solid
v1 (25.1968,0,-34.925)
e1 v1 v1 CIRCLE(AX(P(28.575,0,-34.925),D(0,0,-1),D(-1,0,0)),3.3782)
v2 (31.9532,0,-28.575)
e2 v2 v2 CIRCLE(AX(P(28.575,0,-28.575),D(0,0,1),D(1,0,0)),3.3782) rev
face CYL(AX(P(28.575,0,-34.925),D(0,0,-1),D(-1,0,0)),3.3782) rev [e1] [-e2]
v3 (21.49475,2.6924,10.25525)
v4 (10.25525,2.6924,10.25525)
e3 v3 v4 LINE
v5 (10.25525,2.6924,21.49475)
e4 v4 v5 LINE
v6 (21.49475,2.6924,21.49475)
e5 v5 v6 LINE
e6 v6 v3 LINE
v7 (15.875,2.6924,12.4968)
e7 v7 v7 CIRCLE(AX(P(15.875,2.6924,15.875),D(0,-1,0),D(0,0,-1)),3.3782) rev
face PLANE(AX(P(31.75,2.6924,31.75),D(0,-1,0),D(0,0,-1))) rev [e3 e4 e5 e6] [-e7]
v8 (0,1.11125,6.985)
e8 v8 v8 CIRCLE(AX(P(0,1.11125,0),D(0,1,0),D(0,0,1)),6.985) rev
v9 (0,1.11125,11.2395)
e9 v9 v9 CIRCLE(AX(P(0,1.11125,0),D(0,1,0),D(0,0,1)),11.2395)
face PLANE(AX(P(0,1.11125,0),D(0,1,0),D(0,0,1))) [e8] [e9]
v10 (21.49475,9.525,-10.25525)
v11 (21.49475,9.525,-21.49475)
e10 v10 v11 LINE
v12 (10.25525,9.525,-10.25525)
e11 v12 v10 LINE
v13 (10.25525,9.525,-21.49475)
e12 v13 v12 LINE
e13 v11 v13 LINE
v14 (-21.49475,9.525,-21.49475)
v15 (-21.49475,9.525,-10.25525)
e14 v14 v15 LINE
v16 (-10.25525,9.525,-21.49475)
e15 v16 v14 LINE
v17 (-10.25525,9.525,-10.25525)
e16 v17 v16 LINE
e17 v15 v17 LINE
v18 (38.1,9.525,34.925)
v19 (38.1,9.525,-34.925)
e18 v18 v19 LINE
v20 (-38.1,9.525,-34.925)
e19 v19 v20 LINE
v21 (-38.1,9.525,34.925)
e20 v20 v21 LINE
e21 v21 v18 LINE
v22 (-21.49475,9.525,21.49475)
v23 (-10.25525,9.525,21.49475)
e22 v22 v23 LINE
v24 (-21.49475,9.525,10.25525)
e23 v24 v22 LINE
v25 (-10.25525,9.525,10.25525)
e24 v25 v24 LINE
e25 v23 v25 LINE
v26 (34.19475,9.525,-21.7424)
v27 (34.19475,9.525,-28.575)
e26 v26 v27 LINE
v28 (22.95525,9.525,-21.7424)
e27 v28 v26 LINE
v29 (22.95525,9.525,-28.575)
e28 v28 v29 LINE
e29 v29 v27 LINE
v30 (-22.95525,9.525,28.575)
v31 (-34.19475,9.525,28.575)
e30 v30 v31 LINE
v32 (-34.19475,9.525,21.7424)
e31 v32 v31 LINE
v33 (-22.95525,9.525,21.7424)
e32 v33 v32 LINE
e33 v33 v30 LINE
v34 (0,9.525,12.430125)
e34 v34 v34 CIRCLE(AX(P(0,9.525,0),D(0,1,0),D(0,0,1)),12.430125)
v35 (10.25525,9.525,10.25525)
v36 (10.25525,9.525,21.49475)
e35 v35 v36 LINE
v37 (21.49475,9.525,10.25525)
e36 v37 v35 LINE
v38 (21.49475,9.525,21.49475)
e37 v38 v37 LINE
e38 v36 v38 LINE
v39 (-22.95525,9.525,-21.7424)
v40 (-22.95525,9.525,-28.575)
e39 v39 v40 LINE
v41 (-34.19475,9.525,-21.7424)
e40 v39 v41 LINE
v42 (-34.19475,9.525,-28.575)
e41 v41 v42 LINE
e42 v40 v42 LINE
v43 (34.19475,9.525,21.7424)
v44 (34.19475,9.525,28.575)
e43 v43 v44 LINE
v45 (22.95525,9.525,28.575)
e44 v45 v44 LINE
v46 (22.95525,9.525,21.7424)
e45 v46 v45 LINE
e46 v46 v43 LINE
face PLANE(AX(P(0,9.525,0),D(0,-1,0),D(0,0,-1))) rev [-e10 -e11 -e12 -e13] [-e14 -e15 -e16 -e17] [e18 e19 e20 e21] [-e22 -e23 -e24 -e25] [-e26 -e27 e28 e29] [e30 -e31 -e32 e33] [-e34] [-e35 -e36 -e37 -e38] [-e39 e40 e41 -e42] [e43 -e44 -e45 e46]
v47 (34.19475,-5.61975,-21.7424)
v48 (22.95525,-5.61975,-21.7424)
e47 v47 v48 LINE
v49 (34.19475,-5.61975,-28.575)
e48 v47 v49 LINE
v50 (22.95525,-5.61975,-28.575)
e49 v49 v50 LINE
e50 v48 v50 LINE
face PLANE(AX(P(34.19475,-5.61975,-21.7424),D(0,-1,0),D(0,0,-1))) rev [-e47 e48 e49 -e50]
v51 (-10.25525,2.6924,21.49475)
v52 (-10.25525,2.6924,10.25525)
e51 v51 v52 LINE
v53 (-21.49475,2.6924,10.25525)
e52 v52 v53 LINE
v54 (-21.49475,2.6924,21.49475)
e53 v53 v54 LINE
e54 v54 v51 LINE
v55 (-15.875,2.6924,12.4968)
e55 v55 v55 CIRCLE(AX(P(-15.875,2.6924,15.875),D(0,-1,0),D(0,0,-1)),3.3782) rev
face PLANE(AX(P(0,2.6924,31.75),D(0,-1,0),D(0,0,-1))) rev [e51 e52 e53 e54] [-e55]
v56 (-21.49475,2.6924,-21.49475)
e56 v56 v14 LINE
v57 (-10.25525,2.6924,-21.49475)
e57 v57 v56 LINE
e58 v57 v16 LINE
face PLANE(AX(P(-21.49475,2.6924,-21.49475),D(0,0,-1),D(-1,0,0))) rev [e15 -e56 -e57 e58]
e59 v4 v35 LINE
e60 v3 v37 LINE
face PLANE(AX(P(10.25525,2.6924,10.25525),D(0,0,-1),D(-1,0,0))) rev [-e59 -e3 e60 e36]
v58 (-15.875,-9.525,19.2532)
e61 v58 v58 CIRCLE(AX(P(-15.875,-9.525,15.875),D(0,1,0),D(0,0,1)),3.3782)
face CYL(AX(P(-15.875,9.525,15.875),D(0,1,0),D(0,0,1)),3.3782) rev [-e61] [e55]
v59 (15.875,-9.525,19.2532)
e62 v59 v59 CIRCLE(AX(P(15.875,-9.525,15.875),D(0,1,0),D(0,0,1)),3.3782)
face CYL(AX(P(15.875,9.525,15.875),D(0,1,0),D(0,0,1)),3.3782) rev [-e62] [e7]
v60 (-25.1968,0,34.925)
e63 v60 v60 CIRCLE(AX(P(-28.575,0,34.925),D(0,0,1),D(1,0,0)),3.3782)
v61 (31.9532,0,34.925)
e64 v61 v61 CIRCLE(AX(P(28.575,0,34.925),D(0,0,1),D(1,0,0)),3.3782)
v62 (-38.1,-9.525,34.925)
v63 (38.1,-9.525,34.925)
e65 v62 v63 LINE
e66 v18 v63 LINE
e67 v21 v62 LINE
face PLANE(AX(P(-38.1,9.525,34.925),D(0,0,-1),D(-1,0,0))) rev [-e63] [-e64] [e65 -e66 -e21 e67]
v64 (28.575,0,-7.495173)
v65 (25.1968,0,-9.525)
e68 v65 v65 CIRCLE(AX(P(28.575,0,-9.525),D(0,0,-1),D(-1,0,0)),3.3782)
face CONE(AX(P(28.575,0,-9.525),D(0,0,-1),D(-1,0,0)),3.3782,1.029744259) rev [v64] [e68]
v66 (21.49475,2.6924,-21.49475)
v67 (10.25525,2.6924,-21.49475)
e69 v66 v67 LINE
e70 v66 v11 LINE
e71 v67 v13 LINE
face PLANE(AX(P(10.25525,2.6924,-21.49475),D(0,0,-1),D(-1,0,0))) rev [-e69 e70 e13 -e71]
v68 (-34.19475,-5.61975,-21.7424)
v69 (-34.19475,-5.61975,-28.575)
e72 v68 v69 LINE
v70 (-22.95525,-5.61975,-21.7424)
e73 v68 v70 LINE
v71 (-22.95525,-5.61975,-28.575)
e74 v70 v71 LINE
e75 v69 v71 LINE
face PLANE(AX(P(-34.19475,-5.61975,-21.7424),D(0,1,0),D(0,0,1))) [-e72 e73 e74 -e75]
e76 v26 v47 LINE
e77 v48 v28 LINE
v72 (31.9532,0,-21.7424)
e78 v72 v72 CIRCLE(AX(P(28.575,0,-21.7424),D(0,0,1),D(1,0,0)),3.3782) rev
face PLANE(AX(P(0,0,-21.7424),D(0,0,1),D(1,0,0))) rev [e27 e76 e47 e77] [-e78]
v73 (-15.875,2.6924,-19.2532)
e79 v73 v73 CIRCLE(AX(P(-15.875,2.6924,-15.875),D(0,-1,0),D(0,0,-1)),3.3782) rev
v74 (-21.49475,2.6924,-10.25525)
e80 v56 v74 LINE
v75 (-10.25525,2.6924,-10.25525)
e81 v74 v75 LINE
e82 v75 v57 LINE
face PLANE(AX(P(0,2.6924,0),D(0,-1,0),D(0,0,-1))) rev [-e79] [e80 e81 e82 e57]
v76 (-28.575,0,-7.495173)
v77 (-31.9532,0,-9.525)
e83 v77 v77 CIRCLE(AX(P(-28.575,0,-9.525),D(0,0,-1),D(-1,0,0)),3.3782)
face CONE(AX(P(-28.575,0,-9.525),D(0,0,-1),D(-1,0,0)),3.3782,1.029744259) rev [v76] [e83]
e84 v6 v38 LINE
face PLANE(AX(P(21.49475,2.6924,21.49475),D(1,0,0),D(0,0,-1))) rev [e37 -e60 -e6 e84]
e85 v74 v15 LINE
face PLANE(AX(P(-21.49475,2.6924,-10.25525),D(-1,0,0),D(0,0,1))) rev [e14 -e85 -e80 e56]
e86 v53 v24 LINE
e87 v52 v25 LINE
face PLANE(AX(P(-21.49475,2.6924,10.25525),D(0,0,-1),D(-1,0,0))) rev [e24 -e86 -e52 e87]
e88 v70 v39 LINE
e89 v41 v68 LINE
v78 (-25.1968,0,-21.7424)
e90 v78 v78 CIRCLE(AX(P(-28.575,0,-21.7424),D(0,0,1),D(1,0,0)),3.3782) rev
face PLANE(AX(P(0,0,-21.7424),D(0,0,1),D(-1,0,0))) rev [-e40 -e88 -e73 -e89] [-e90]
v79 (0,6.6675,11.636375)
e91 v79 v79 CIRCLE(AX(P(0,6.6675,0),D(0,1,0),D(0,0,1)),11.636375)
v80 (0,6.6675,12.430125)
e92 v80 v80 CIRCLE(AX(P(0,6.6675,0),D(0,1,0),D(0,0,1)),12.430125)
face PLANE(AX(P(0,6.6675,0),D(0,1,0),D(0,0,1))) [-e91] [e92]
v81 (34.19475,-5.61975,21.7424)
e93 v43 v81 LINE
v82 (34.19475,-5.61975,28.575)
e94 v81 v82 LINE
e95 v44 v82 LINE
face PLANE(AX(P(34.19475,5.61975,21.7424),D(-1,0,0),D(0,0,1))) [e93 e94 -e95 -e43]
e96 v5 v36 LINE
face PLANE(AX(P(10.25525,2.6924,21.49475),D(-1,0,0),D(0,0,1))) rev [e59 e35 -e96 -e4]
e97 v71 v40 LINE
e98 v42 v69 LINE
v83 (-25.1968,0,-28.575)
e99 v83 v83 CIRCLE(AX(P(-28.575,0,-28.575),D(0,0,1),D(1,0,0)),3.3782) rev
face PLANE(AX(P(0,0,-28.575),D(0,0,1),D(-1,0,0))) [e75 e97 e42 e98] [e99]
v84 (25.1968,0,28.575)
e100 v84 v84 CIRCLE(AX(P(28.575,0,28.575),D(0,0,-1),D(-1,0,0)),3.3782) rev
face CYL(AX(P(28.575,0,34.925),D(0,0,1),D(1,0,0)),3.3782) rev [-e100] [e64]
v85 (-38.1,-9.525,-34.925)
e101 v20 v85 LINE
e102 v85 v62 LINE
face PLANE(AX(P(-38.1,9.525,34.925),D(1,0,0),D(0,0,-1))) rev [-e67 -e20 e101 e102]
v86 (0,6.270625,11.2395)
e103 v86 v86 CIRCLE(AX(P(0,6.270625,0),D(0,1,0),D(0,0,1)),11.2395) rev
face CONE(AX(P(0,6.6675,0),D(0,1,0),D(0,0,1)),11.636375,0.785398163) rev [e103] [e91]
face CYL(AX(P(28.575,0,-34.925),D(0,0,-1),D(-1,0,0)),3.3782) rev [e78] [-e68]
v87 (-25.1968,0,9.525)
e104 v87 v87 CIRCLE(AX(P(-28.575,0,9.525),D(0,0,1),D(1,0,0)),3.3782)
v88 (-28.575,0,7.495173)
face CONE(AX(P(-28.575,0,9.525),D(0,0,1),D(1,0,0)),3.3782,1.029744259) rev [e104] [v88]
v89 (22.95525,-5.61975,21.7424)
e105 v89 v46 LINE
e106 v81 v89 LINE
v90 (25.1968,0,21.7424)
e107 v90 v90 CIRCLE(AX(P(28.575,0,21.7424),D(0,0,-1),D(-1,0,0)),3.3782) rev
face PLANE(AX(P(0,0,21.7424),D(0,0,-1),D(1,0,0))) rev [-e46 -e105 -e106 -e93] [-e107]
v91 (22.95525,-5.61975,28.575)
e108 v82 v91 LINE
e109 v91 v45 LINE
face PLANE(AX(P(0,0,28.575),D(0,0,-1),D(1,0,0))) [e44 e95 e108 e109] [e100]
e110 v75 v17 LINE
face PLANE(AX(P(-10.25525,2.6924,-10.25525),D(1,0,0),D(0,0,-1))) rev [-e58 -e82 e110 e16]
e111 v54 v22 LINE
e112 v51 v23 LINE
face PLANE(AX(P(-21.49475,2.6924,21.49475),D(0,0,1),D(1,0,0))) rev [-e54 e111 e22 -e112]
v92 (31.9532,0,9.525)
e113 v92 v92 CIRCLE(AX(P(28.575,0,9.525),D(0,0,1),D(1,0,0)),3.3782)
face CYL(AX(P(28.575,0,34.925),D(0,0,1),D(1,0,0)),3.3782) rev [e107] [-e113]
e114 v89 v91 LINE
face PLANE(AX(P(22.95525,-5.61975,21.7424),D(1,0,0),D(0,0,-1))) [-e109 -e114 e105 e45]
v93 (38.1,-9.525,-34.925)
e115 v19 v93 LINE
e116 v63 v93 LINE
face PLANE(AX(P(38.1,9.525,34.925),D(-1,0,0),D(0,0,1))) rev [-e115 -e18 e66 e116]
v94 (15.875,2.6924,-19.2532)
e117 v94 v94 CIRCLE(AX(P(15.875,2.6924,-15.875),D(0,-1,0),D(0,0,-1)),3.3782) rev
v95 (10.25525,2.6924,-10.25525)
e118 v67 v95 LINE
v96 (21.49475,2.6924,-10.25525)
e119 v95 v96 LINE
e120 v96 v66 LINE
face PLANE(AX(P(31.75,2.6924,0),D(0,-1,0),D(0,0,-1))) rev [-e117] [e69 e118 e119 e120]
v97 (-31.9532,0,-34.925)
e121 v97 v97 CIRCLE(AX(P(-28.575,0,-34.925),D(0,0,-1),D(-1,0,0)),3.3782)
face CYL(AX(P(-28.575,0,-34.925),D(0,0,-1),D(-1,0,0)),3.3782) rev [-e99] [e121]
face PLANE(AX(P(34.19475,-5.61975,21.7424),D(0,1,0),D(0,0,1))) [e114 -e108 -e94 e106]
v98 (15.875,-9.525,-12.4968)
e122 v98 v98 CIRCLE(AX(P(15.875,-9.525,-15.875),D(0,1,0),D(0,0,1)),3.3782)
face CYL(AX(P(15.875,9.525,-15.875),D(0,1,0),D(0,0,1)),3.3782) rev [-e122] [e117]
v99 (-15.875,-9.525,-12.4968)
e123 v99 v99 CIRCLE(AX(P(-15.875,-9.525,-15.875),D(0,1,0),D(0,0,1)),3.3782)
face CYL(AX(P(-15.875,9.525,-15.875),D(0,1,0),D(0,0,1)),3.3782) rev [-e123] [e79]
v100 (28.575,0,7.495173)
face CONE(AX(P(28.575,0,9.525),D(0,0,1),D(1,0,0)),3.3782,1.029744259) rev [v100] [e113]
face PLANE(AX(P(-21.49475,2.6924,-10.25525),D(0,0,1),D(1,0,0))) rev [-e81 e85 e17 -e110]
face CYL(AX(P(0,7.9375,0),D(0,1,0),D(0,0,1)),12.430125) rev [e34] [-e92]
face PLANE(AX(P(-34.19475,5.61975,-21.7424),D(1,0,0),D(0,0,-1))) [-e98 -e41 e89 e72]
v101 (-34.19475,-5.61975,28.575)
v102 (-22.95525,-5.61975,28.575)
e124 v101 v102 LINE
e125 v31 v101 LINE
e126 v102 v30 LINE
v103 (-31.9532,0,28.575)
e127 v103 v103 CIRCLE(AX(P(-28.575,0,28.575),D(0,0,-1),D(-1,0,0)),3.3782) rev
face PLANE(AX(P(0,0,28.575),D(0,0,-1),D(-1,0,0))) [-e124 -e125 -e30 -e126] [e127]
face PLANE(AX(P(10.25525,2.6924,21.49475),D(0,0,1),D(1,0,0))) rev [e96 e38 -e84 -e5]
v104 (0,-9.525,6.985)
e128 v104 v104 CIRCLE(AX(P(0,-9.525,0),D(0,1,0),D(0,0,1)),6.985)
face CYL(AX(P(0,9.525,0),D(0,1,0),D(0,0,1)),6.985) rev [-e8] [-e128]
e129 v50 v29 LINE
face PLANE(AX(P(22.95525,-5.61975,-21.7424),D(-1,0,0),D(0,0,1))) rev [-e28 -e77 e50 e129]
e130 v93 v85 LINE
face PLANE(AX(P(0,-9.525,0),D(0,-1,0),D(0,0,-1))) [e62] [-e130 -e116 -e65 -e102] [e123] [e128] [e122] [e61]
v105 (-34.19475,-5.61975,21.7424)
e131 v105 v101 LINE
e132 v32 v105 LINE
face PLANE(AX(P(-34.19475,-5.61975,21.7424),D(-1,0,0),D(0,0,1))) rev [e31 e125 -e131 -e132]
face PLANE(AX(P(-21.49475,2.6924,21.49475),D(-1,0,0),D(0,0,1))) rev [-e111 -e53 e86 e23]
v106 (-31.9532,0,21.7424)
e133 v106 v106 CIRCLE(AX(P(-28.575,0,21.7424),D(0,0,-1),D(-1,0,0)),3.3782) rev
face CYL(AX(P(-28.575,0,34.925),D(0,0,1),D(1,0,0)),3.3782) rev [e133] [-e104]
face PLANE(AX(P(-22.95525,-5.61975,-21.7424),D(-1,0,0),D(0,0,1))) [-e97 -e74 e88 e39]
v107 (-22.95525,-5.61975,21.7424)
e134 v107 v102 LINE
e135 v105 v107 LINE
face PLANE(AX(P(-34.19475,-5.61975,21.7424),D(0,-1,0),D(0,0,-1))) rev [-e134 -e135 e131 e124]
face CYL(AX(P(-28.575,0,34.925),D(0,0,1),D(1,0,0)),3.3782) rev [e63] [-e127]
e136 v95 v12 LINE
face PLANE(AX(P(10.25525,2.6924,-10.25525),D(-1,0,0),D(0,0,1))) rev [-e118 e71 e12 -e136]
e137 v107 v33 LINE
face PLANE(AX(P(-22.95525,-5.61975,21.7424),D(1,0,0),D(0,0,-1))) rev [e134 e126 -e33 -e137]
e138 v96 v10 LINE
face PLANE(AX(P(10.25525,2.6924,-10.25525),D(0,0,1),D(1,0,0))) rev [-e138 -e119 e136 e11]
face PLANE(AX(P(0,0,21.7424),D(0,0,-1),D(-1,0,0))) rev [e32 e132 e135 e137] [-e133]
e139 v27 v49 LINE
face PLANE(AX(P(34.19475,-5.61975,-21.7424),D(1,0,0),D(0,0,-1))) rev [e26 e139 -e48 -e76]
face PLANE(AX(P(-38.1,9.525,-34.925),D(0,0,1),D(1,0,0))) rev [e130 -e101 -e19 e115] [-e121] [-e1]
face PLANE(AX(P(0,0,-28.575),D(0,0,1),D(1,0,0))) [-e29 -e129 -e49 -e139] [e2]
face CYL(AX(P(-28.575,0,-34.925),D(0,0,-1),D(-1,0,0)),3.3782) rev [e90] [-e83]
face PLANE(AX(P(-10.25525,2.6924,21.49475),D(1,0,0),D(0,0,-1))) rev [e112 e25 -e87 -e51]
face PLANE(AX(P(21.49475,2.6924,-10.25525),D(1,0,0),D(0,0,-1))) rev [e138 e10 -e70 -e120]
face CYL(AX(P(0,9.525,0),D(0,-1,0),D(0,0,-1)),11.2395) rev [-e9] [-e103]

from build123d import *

# Parameters (mm, degrees)
SKETCH1_W               = 76.2
SKETCH1_H               = 69.85
BOSS_EXTRUDE1_DEPTH     = 9.525
F_1_4_CLEARANCE_HOLE1_D = 6.7564
SKETCH5_W               = 11.2395
SKETCH5_H               = 11.2395
CUT_EXTRUDE1_DEPTH      = 6.8326
F_3_8_CLEARANCE_HOLE1_D = 13.97
CUT_EXTRUDE2_START      = -6.35
CUT_EXTRUDE2_DEPTH      = 6.8326
MIRROR2_START           = -6.35
MIRROR2_COPY_2_DEPTH    = 6.8326


with BuildPart() as part:
    # Sketch1 → Boss-Extrude1 (new, symmetric)
    with BuildSketch(Plane(origin=(0, 0, 0), x_dir=(1, 0, 0), z_dir=(0, 1, 0))):
        Rectangle(SKETCH1_W, SKETCH1_H)
    extrude(amount=BOSS_EXTRUDE1_DEPTH, both=True)

    # 1/4 Clearance Hole1 (through all)
    with Locations(Plane(origin=(0, 9.525, 0), x_dir=(1, 0, 0), z_dir=(0, 1, 0))):
        with Locations((-15.875, 15.875)):
            f_1_4_clearance_hole1 = Hole(F_1_4_CLEARANCE_HOLE1_D / 2)

    # Sketch5 → Cut-Extrude1 (cut)
    with BuildSketch(Plane(origin=(0, 9.525, 0), x_dir=(1, 0, 0), z_dir=(0, 1, 0))):
        with Locations((-15.875, 15.875)):
            Rectangle(SKETCH5_W, SKETCH5_H)
    cut_extrude1 = extrude(amount=-CUT_EXTRUDE1_DEPTH, mode=Mode.SUBTRACT)

    # Sketch-Pattern1: 1/4 Clearance Hole1, Cut-Extrude1 at 3 more places
    with Locations((31.75, 0, 0), (31.75, 0, 31.75), (0, 0, 31.75)):
        add(f_1_4_clearance_hole1, mode=Mode.SUBTRACT)
        add(cut_extrude1, mode=Mode.SUBTRACT)

    # 3/8 Clearance Hole1 (through all)
    with Locations(Plane(origin=(0, 9.525, 0), x_dir=(1, 0, 0), z_dir=(0, 1, 0))):
        with Locations((0, 0)):
            Hole(F_3_8_CLEARANCE_HOLE1_D / 2)


with BuildPart() as body_2:
    # uxcell-FR6ZZ: read off the stored shape, not the designer's step
    # uxcell-FR6ZZ outline → uxcell-FR6ZZ (revolve)
    with BuildSketch(Plane(origin=(-26.978230937, 0, 2.629647059), x_dir=(1, 0, 0), z_dir=(0, 0, 1))):
        Polygon((12.430125, 16.66875), (4.7625, 16.66875), (4.7625, 8.255), (11.2395, 8.255), (11.2395, 13.414375), (11.636375, 13.81125), (12.430125, 13.81125), align=None)
    revolve(axis=Axis((-26.978230937, 0, 2.629647059), (0, 1, 0)))


with BuildPart() as body_2_1:
    # Body-Move/Copy2: read off the stored shape, not the designer's step
    # Body-Move/Copy2: moved
    add(body_2.part.moved(Location((26.9782309, -7.14375, -2.6296471))))


with BuildPart() as part_1:
    add(part.part)

    # Combine1: cut body 2
    add(body_2_1.part, mode=Mode.SUBTRACT)

    # Sketch11 → 1/4 Clearance Hole2 (revolve, cut)
    with BuildSketch(Plane(origin=(-28.575, 0, 34.925), x_dir=(0, -1, 0), z_dir=(1, 0, 0))):
        Polygon((0, 0), (0, 27.429827343), (3.3782, 25.4), (3.3782, 0), align=None)
    f_1_4_clearance_hole2 = revolve(axis=Axis((-28.575, 0, 41.275), (0, 0, -1)), mode=Mode.SUBTRACT)

    # Sketch13 → Cut-Extrude2 (cut)
    with BuildSketch(Plane.XY.offset(34.925).offset(CUT_EXTRUDE2_START)):
        Polygon((-34.19475, 5.61975), (-34.19475, 9.525), (-22.95525, 9.525), (-22.95525, 5.61975), (-22.95525, -5.61975), (-34.19475, -5.61975), align=None)
    cut_extrude2 = extrude(amount=-CUT_EXTRUDE2_DEPTH, mode=Mode.SUBTRACT)

    # Mirror1: 1/4 Clearance Hole2, Cut-Extrude2 across plane
    add(f_1_4_clearance_hole2.mirror(Plane(origin=(0, 0, 0), x_dir=(0, 0, 1), z_dir=(1, 0, 0))), mode=Mode.SUBTRACT)
    add(cut_extrude2.mirror(Plane(origin=(0, 0, 0), x_dir=(0, 0, 1), z_dir=(1, 0, 0))), mode=Mode.SUBTRACT)

    # Mirror2: 1/4 Clearance Hole2, Cut-Extrude2 across plane
    add(f_1_4_clearance_hole2.mirror(Plane.XY), mode=Mode.SUBTRACT)
    add(cut_extrude2.mirror(Plane.XY), mode=Mode.SUBTRACT)

    # Mirror2 copy 1 sketch → Mirror2 copy 1 (revolve, cut)
    with BuildSketch(Plane(origin=(28.575, 0, -34.925), x_dir=(0, -1, 0), z_dir=(-1, 0, 0))):
        Polygon((0, 0), (0, 27.429827343), (3.3782, 25.4), (3.3782, 0), align=None)
    revolve(axis=Axis((28.575, 0, -41.275), (0, 0, 1)), mode=Mode.SUBTRACT)

    # Mirror2 copy 2 sketch → Mirror2 copy 2 (cut)
    with BuildSketch(Plane(origin=(0, 0, -34.925), x_dir=(-1, 0, 0), z_dir=(0, 0, -1)).offset(MIRROR2_START)):
        Polygon((-34.19475, 5.61975), (-34.19475, 9.525), (-22.95525, 9.525), (-22.95525, 5.61975), (-22.95525, -5.61975), (-34.19475, -5.61975), align=None)
    extrude(amount=-MIRROR2_COPY_2_DEPTH, mode=Mode.SUBTRACT)


solid = part_1.part
